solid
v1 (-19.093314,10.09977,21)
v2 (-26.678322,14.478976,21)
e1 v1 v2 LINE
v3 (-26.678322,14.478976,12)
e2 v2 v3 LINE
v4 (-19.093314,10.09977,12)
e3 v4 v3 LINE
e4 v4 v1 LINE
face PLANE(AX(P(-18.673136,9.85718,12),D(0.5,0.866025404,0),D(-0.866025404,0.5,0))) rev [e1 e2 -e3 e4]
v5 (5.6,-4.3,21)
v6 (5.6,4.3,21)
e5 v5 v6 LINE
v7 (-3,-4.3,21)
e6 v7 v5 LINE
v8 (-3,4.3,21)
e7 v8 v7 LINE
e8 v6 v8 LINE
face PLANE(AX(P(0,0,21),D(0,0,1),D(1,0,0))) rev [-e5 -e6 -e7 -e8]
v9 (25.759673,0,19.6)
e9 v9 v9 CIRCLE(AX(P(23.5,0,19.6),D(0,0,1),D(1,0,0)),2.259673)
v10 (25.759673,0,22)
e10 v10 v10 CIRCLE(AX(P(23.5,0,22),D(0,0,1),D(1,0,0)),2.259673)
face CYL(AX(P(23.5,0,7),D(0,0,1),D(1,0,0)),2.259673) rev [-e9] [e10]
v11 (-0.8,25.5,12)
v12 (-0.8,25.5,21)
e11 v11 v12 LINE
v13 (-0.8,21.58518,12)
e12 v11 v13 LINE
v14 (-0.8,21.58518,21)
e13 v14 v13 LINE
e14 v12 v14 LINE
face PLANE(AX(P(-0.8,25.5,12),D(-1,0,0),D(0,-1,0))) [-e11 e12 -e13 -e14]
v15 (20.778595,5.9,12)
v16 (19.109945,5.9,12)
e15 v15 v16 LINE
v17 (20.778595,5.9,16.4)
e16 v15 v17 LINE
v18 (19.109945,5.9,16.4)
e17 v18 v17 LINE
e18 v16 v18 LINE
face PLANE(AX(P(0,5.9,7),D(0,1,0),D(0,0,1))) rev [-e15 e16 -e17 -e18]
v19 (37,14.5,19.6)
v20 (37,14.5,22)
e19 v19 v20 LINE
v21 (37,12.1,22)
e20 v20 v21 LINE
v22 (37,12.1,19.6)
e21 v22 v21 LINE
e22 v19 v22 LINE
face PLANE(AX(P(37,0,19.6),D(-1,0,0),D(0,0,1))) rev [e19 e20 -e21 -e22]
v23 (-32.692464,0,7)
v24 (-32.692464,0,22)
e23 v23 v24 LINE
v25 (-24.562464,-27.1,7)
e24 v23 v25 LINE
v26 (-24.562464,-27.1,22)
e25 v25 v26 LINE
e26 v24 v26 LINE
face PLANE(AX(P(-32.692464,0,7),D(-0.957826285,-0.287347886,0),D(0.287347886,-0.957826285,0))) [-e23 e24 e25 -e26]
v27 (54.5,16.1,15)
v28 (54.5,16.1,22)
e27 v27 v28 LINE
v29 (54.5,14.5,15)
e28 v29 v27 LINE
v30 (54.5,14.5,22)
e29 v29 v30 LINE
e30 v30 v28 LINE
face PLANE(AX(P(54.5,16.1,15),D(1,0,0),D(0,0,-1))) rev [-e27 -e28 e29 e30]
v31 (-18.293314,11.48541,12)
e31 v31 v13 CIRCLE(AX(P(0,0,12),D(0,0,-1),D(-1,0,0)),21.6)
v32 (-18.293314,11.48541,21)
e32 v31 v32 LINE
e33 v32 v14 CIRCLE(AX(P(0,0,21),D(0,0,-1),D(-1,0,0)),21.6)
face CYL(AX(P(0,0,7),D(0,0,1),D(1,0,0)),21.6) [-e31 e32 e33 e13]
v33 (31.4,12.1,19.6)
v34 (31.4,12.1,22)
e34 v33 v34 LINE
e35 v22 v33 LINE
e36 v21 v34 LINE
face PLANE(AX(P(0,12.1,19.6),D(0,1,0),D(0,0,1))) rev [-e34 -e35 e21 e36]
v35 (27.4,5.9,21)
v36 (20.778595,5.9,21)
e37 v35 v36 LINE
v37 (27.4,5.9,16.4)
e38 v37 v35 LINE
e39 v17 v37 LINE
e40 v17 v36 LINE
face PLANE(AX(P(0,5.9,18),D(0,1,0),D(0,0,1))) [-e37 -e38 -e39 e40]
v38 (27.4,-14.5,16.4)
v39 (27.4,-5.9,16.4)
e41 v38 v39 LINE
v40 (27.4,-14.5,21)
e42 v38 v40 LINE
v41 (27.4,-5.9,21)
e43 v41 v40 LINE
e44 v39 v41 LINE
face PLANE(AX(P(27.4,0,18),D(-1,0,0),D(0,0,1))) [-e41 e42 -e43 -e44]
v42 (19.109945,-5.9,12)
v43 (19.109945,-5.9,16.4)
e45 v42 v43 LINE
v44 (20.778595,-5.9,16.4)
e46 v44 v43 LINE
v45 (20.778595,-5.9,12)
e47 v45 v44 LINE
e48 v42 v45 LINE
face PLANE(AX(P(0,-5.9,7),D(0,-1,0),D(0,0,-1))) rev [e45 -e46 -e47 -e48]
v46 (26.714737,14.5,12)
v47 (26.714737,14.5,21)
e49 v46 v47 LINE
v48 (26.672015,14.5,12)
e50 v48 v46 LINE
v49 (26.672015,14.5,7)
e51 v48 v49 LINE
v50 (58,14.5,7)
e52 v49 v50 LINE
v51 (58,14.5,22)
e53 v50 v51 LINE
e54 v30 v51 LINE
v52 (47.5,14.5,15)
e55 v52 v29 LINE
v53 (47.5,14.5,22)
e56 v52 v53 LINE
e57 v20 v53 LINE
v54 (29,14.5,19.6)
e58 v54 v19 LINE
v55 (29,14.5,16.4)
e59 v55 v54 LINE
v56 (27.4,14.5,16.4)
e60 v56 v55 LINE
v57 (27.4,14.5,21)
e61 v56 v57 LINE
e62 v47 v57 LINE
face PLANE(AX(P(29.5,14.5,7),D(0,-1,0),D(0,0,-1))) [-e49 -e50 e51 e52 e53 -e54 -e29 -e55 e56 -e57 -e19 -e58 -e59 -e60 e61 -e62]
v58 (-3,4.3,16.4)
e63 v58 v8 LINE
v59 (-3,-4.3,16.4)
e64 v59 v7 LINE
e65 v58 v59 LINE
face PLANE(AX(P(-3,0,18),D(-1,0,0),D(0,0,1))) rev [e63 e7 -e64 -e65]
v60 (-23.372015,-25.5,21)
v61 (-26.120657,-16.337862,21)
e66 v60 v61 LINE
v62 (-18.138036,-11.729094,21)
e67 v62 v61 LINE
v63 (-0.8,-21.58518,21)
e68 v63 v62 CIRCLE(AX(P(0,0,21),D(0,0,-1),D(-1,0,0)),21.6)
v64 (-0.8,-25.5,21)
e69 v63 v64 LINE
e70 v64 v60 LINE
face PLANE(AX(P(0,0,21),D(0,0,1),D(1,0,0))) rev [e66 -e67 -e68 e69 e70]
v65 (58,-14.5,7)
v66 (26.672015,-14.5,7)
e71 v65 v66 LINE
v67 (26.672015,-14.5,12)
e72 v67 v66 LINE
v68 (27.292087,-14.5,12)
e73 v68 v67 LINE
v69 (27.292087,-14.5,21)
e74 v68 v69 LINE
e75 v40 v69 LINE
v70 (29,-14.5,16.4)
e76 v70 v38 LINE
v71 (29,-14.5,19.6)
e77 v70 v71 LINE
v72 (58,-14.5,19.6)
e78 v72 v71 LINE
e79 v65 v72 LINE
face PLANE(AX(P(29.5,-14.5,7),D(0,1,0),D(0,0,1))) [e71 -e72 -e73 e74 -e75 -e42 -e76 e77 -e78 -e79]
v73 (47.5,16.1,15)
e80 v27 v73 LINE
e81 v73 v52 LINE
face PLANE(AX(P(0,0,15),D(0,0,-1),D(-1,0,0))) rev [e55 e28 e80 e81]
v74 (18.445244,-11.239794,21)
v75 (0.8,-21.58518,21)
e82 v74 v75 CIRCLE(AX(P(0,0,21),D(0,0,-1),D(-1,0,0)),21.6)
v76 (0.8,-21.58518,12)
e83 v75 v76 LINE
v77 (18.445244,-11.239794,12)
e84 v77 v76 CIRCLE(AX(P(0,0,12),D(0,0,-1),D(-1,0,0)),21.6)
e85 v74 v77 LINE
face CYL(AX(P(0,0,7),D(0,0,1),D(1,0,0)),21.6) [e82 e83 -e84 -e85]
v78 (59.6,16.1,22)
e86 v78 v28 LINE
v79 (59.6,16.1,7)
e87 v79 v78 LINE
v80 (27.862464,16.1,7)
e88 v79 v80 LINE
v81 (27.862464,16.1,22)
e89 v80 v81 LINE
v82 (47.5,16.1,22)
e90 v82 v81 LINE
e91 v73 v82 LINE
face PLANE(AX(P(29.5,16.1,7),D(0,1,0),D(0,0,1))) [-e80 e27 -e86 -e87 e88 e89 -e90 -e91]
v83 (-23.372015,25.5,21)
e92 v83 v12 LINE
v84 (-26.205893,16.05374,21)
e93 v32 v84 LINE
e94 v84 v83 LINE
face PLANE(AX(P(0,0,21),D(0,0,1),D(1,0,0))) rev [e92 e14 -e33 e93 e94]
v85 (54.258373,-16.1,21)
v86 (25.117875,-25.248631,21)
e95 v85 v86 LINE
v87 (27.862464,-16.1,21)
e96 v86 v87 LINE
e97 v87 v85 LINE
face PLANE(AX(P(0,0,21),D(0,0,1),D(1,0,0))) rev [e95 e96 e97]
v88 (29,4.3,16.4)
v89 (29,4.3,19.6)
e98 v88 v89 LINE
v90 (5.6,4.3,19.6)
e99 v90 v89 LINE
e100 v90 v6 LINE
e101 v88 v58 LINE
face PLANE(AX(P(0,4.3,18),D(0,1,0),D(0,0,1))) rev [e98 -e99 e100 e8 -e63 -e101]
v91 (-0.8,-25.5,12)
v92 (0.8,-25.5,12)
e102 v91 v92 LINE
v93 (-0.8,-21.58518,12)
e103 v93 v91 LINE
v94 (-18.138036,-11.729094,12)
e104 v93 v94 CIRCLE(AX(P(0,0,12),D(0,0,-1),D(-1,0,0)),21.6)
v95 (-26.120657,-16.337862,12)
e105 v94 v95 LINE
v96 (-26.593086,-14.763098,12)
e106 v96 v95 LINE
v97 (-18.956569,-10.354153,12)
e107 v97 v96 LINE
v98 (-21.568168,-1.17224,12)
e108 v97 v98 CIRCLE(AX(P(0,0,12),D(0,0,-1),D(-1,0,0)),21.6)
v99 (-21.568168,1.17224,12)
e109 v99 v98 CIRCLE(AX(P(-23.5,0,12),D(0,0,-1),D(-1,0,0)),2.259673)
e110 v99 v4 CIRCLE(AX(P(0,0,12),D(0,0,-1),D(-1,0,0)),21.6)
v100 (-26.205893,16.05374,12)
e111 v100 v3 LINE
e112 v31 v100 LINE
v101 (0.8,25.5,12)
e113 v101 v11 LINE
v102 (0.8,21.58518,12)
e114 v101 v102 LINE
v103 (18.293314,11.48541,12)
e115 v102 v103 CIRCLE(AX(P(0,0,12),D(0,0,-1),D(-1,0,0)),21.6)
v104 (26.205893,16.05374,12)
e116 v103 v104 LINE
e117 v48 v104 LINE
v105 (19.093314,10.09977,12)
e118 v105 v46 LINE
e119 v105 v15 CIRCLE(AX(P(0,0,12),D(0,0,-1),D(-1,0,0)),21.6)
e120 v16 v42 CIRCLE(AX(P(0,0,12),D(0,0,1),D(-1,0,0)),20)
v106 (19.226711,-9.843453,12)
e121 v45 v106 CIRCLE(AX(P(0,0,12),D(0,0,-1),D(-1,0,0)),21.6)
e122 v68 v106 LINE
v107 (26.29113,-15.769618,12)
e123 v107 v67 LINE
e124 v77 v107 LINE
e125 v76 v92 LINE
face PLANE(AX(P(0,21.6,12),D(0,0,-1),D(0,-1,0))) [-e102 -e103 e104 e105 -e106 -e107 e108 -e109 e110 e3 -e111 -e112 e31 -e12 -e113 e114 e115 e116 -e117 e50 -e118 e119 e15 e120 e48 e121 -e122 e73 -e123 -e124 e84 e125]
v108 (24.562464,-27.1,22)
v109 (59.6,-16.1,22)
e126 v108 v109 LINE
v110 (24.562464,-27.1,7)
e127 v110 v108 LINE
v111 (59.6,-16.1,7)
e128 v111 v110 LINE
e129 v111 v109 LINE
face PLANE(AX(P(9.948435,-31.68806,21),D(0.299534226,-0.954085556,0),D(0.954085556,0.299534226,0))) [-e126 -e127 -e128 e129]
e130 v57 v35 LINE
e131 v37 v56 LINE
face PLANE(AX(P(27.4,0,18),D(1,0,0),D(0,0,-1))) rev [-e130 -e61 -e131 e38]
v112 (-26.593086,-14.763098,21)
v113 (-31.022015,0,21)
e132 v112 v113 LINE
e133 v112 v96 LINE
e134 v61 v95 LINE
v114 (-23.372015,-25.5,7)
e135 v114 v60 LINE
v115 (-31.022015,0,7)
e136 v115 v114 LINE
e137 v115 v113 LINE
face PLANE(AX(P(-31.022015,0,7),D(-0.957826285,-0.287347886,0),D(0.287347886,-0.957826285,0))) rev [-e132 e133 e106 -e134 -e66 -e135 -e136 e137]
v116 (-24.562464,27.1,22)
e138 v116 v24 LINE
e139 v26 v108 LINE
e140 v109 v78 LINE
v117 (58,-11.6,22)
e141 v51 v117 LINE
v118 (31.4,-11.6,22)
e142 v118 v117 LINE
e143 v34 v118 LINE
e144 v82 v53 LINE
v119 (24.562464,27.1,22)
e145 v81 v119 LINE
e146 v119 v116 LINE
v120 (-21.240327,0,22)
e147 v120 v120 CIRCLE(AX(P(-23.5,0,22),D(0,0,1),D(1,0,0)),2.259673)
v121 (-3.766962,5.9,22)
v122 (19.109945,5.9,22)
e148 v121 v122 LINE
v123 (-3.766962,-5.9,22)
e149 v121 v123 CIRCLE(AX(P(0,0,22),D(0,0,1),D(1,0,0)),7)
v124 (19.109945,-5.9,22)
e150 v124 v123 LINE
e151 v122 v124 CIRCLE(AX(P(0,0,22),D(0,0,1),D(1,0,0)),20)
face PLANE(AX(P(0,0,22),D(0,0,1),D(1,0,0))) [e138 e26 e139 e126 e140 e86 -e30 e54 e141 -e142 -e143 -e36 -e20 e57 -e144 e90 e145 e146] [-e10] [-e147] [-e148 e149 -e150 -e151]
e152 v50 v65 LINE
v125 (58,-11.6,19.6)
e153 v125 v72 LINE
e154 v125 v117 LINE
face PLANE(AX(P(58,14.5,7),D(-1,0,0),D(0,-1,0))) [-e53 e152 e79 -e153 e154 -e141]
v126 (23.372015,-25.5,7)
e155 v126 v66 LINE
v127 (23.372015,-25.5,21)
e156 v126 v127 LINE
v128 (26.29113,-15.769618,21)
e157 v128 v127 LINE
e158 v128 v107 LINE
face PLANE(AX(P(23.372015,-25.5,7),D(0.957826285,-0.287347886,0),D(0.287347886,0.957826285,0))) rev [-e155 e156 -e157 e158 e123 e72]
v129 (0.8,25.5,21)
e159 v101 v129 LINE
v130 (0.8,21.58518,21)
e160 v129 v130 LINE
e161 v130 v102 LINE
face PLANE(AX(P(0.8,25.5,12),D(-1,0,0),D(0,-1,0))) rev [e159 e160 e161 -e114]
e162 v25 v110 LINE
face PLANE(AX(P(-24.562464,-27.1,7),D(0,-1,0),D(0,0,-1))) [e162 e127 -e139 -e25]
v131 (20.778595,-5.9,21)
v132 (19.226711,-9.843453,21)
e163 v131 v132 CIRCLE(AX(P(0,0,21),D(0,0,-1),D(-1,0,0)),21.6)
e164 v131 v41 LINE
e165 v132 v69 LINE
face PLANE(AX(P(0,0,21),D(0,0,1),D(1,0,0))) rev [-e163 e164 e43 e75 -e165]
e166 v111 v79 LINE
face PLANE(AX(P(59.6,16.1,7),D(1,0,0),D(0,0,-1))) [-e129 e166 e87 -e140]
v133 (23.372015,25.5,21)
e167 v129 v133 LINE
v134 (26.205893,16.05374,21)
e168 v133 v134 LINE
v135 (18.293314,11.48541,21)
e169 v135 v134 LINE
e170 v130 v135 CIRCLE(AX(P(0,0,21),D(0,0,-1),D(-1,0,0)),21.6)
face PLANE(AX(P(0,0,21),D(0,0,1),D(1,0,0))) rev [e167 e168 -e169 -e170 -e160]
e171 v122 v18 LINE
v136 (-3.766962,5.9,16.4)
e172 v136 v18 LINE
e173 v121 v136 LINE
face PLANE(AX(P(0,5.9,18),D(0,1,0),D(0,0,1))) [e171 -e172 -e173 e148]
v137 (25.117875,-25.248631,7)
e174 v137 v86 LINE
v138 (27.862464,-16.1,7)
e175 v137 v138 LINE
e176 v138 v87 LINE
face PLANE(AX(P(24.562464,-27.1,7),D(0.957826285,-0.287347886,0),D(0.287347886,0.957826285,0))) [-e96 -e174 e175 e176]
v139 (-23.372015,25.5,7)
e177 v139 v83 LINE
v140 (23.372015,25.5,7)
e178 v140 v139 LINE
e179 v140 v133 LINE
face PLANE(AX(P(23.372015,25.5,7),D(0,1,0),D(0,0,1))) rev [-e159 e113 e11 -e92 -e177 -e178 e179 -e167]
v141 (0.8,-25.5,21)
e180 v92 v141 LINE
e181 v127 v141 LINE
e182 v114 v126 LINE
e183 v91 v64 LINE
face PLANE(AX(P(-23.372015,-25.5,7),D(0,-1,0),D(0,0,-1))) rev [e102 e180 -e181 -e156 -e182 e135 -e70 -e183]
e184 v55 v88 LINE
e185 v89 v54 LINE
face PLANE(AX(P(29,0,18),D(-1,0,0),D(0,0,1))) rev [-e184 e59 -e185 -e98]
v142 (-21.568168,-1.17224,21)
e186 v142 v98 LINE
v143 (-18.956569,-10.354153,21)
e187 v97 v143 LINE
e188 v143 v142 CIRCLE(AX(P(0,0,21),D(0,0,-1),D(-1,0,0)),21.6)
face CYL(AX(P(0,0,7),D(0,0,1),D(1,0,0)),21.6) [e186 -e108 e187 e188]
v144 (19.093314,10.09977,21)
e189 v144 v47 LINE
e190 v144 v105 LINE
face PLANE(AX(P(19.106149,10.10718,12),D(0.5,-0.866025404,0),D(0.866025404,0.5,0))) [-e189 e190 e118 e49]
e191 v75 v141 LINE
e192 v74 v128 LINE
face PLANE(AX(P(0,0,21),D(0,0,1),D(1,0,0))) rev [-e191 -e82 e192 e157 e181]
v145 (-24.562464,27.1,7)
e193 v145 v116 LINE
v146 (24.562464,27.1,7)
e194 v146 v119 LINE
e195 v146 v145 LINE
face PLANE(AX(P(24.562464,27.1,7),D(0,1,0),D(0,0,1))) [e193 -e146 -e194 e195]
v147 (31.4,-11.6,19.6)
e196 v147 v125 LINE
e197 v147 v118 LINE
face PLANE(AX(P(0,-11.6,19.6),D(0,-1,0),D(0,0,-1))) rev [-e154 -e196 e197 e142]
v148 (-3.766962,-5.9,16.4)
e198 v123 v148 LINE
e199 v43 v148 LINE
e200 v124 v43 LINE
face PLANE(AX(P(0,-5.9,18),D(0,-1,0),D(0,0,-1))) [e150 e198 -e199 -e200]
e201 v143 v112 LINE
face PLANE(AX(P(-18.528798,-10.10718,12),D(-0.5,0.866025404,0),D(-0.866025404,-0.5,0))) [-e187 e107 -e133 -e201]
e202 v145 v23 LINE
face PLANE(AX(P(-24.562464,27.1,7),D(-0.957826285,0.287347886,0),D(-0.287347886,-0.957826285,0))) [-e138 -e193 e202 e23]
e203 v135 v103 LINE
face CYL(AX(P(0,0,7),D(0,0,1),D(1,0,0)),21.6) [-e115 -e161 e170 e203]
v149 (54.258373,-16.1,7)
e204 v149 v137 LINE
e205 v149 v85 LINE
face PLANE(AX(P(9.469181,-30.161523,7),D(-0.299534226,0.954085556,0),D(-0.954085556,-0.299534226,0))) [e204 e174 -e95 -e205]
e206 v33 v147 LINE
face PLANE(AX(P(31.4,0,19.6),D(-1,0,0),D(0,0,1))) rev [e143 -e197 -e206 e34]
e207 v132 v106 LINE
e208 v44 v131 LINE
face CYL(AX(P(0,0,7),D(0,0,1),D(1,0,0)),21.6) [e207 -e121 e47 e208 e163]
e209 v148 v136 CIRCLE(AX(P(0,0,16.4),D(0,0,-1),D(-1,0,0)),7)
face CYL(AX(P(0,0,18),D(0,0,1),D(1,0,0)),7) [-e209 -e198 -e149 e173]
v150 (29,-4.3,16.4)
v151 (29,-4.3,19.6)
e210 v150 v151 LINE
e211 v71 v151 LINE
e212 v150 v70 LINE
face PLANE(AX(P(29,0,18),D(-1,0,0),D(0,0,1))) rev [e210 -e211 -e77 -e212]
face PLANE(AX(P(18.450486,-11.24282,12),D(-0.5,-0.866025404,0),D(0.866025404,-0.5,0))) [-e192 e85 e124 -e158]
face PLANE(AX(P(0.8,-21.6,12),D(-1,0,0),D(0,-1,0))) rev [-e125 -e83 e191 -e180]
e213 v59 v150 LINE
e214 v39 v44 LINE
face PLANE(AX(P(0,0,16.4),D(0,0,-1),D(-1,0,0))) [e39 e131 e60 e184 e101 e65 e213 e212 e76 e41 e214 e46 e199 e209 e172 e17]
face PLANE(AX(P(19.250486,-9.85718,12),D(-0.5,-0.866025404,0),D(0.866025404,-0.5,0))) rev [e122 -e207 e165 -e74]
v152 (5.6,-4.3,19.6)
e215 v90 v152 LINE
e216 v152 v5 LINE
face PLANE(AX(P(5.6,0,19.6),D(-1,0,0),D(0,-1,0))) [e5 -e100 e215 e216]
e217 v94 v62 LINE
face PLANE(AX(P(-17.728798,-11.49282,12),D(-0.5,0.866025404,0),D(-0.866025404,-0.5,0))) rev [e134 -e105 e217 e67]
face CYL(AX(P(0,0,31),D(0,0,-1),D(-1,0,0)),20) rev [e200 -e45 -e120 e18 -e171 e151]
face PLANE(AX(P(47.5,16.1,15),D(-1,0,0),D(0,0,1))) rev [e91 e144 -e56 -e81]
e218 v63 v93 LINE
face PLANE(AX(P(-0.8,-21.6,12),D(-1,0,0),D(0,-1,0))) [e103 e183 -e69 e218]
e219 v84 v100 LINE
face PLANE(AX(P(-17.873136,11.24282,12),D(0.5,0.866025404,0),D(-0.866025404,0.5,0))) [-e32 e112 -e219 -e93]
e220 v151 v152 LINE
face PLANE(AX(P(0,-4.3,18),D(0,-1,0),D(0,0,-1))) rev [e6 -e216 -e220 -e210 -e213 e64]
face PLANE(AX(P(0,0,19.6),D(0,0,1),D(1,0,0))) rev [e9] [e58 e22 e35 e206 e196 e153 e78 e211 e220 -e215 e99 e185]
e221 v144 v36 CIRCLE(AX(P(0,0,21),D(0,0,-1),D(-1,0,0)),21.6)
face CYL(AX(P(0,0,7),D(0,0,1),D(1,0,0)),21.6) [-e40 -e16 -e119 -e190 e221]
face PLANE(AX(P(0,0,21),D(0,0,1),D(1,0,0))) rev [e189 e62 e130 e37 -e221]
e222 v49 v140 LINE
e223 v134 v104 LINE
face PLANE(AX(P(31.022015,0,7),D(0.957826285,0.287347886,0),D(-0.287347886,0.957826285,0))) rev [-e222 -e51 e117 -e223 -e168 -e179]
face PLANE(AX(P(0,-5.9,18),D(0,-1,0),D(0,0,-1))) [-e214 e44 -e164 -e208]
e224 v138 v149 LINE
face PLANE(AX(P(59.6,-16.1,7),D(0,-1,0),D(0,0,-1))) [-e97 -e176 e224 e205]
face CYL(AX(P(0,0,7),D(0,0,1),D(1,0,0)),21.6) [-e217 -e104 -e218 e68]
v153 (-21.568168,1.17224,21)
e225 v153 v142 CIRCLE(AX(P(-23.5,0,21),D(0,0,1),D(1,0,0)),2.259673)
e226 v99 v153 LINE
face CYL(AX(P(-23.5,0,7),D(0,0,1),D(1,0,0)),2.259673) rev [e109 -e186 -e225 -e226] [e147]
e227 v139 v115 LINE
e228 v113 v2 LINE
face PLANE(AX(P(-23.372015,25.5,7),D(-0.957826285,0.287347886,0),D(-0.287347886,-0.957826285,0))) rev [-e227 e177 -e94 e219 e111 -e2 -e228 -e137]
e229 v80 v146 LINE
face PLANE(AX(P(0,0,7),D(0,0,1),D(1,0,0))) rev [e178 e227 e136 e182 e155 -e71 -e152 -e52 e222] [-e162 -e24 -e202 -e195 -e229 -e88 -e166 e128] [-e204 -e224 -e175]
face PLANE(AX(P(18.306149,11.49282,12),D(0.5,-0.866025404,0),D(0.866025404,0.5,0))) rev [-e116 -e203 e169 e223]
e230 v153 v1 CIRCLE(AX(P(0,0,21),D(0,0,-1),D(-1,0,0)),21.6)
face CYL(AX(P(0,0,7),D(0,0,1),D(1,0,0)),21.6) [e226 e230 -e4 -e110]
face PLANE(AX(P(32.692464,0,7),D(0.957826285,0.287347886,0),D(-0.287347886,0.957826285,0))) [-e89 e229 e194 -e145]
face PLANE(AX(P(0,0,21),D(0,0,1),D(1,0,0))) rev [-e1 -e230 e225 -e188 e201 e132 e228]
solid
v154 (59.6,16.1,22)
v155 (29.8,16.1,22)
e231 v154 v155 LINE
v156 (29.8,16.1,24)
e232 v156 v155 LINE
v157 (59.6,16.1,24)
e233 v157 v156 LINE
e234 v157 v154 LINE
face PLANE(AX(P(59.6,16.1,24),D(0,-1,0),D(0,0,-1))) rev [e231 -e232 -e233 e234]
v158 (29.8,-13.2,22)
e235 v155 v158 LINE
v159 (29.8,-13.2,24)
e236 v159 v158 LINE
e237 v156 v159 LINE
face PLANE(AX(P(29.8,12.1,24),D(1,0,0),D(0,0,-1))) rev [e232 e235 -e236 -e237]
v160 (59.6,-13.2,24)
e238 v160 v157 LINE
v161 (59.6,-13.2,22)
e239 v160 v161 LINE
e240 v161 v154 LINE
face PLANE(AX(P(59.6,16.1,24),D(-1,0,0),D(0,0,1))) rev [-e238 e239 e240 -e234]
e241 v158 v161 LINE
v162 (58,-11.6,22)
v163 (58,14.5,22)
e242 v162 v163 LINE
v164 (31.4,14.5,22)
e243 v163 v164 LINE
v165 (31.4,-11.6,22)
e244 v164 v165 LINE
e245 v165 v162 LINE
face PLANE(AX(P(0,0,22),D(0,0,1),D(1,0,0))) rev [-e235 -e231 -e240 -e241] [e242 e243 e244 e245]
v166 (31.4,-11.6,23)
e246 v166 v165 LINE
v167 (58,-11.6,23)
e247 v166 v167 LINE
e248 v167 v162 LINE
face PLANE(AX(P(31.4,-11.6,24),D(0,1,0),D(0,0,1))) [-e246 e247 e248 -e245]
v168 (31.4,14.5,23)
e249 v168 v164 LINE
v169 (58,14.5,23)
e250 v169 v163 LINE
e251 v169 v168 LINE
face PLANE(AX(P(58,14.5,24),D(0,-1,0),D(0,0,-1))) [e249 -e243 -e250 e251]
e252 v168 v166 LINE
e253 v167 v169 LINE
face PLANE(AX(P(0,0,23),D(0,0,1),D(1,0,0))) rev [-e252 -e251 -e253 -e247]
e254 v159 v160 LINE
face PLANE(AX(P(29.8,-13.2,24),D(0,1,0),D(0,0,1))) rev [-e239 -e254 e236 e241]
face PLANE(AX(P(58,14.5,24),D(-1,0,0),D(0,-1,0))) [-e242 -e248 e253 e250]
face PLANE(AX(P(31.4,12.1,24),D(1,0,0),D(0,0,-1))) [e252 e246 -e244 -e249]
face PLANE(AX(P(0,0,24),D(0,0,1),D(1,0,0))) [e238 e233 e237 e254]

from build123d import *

# Parameters (mm, degrees)
BOSS_EXTRUDE1_DEPTH      = 10
BOSS_EXTRUDE1_DEPTH_BACK = 5
BOSS_EXTRUDE2_DEPTH      = 15
CUT_EXTRUDE1_DEPTH       = 68.168221653
BOSS_EXTRUDE3_DEPTH      = 4
SKETCH7_R                = 1.75
BOSS_EXTRUDE4_DEPTH      = 2.4
SKETCH8_R                = 3.5
BOSS_EXTRUDE5_DEPTH      = 1
CUT_EXTRUDE2_DEPTH       = 10
BOSS_EXTRUDE7_START      = 14
BOSS_EXTRUDE7_DEPTH      = 14
RIB9_START               = -9
RIB9_DEPTH               = 9
CUT_EXTRUDE3_DEPTH       = 5
SKETCH18_R               = 2.259673145
CUT_EXTRUDE4_DEPTH       = 68.168221653
SKETCH20_R               = 3.5
SKETCH20_W               = 8.6
SKETCH20_H               = 8.6
BOSS_EXTRUDE8_DEPTH      = 1
SKETCH21_W               = 7
SKETCH21_H               = 1.6
CUT_EXTRUDE5_DEPTH       = 7
BOSS_EXTRUDE9_DEPTH      = 1
BOSS_EXTRUDE10_DEPTH     = 14
BOSS_EXTRUDE11_DEPTH     = 2
SKETCH25_W               = 26.6
SKETCH25_H               = 26.1
BOSS_EXTRUDE12_DEPTH     = 1
BOSS_EXTRUDE13_DEPTH     = 4
CUT_EXTRUDE6_START       = -4
CUT_EXTRUDE6_DEPTH       = 4
BOSS_EXTRUDE14_DEPTH     = 1.6


# Read off the part's stored shape, not the designer's step: Rib9
with BuildPart() as part:
    # Sketch2 → Boss-Extrude1 (new, two sides: drawn at the far end of the back side and taken through both)
    with BuildSketch(Plane.XY.offset(12).offset(-BOSS_EXTRUDE1_DEPTH_BACK)):
        Polygon((-24.562464367, 27.1), (-32.692464367, 0), (-24.562464367, -27.1), (24.562464367, -27.1), (32.692464367, 0), (24.562464367, 27.1), align=None)
        Polygon((-23.372015325, 25.5), (-31.022015325, 0), (-23.372015325, -25.5), (23.372015325, -25.5), (31.022015325, 0), (23.372015325, 25.5), align=None, mode=Mode.SUBTRACT)
    extrude(amount=BOSS_EXTRUDE1_DEPTH + BOSS_EXTRUDE1_DEPTH_BACK)

    # Sketch3 → Boss-Extrude2 (add)
    with BuildSketch(Plane.XY.offset(22)):
        Polygon((29.5, 16.1), (59.6, 16.1), (59.6, -16.1), (29.5, -16.1), (27.862464367, -16.1), (28.342464367, -14.5), (29.5, -14.5), (58, -14.5), (58, 14.5), (29.5, 14.5), (28.342464367, 14.5), (27.862464367, 16.1), align=None)
    extrude(amount=-BOSS_EXTRUDE2_DEPTH)

    # Sketch4 → Cut-Extrude1 (cut, through all)
    with BuildSketch(Plane(origin=(0, 0, 7), x_dir=(-1, 0, 0), z_dir=(0, 0, -1))):
        Polygon((-26.672015325, 14.5), (-28.342464367, 14.5), (-32.692464367, 0), (-28.342464367, -14.5), (-26.672015325, -14.5), (-31.022015325, 0), align=None)
    extrude(amount=-CUT_EXTRUDE1_DEPTH, mode=Mode.SUBTRACT)

    # Sketch5 → Boss-Extrude3 (add)
    with BuildSketch(Plane.XY.offset(22)):
        Polygon((29, 4.3), (29, 14), (29, 14.5), (27.4, 14.5), (27.4, 14), (27.4, 5.9), (-4.6, 5.9), (-4.6, -5.9), (27.4, -5.9), (27.4, -14), (27.4, -14.5), (29, -14.5), (29, -14), (29, -4.3), (-3, -4.3), (-3, 4.3), align=None)
    extrude(amount=-BOSS_EXTRUDE3_DEPTH)

    # Sketch7 → Boss-Extrude4 (add)
    with BuildSketch(Plane.XY.offset(22)):
        Polygon((37, 12.1), (37, 14.5), (29, 14.5), (29, 4.3), (5.6, 4.3), (5.6, -4.3), (29, -4.3), (29, -14.5), (58, -14.5), (58, -11.6), (31.4, -11.6), (31.4, 12.1), align=None)
        with Locations((23.5, 0)):
            Circle(SKETCH7_R, mode=Mode.SUBTRACT)
    extrude(amount=-BOSS_EXTRUDE4_DEPTH)

    # Sketch8 → Boss-Extrude5 (add)
    with BuildSketch(Plane.XY.offset(22)):
        Polygon((27.4, -5.9), (27.4, -14.5), (26.672015325, -14.5), (23.372015325, -25.5), (-23.372015325, -25.5), (-31.022015325, 0), (-23.372015325, 25.5), (23.372015325, 25.5), (26.672015325, 14.5), (27.4, 14.5), (27.4, 5.9), (-4.6, 5.9), (-4.6, -5.9), align=None)
        with Locations((-18.25, 18.25)):
            Circle(SKETCH8_R, mode=Mode.SUBTRACT)
        with Locations((18.25, 18.25)):
            Circle(SKETCH8_R, mode=Mode.SUBTRACT)
        with Locations((18.25, -18.25)):
            Circle(SKETCH8_R, mode=Mode.SUBTRACT)
        with Locations((-18.25, -18.25)):
            Circle(SKETCH8_R, mode=Mode.SUBTRACT)
    extrude(amount=-BOSS_EXTRUDE5_DEPTH)

    # Sketch11 → Cut-Extrude2 (cut)
    with BuildSketch(Plane(origin=(0, 0, 21), x_dir=(-1, 0, 0), z_dir=(0, 0, -1))):
        with BuildLine():
            Line((4.6, -5.9), (-19.109945055, -5.9))
            ThreePointArc((-19.109945055, -5.9), (2.983378865, -19.776234489), (20, 0))
            ThreePointArc((20, 0), (2.983378865, 19.776234489), (-19.109945055, 5.9))
            Line((-19.109945055, 5.9), (4.6, 5.9))
            Line((4.6, 5.9), (4.6, -5.9))
        make_face()
    extrude(amount=-CUT_EXTRUDE2_DEPTH, mode=Mode.SUBTRACT)

    # Sketch12 → Boss-Extrude7 (add)
    with BuildSketch(Plane(origin=(0, 0, 21), x_dir=(-1, 0, 0), z_dir=(0, 0, -1)).offset(BOSS_EXTRUDE7_START)):
        with BuildLine():
            ThreePointArc((21.6, 0), (2.978452055, 21.393663159), (-20.778594755, 5.9))
            Line((-20.778594755, 5.9), (-19.109945055, 5.9))
            ThreePointArc((-19.109945055, 5.9), (20, 0), (-19.109945055, -5.9))
            Line((-19.109945055, -5.9), (-20.778594755, -5.9))
            ThreePointArc((-20.778594755, -5.9), (2.978452055, -21.393663159), (21.6, 0))
        make_face()
    extrude(amount=-BOSS_EXTRUDE7_DEPTH)

    # Rib9 outline → Rib9 (add)
    with BuildSketch(Plane(origin=(0, 0, 12), x_dir=(-1, 0, 0), z_dir=(0, 0, -1)).offset(RIB9_START)):
        with BuildLine():
            ThreePointArc((-0.8, 21.585180101), (0, 21.6), (0.8, 21.585180101))
            Line((0.8, 21.585180101), (0.8, 25.5))
            Line((0.8, 25.5), (-0.8, 25.5))
            Line((-0.8, 25.5), (-0.8, 21.585180101))
        make_face()
        with BuildLine():
            Line((26.205893326, 16.053739997), (18.293314313, 11.485410374))
            ThreePointArc((18.293314313, 11.485410374), (18.706148722, 10.8), (19.093314313, 10.099769728))
            Line((19.093314313, 10.099769728), (26.678322459, 14.478976222))
            Line((26.678322459, 14.478976222), (26.205893326, 16.053739997))
        make_face()
        with BuildLine():
            ThreePointArc((-19.093314313, 10.099769728), (-18.706148721, 10.8), (-18.293314313, 11.485410374))
            Line((-18.293314313, 11.485410374), (-26.205893326, 16.053739997))
            Line((-26.205893326, 16.053739997), (-26.672015325, 14.5))
            Line((-26.672015325, 14.5), (-26.71473671, 14.5))
            Line((-26.71473671, 14.5), (-19.093314313, 10.099769728))
        make_face()
        with BuildLine():
            Line((26.593085869, -14.763098188), (18.9565691, -10.354153175))
            ThreePointArc((18.9565691, -10.354153175), (18.560039094, -11.049205801), (18.138036207, -11.729093851))
            Line((18.138036207, -11.729093851), (26.120656737, -16.337861962))
            Line((26.120656737, -16.337861962), (26.593085869, -14.763098188))
        make_face()
        with BuildLine():
            Line((0.8, -25.5), (0.8, -21.585180101))
            ThreePointArc((0.8, -21.585180101), (0, -21.6), (-0.8, -21.585180101))
            Line((-0.8, -21.585180101), (-0.8, -25.5))
            Line((-0.8, -25.5), (0.8, -25.5))
        make_face()
        with BuildLine():
            Line((-26.291129916, -15.769618032), (-18.445244234, -11.239793821))
            ThreePointArc((-18.445244234, -11.239793821), (-18.848912462, -10.548862451), (-19.226711341, -9.843453205))
            Line((-19.226711341, -9.843453205), (-27.292086979, -14.5))
            Line((-27.292086979, -14.5), (-26.672015325, -14.5))
            Line((-26.672015325, -14.5), (-26.291129916, -15.769618032))
        make_face()
    extrude(amount=RIB9_DEPTH)

    # Sketch17 → Cut-Extrude3 (cut)
    with BuildSketch(Plane(origin=(0, 0, 7), x_dir=(-1, 0, 0), z_dir=(0, 0, -1))):
        with BuildLine():
            Line((-19.109945055, -5.9), (-20.778594755, -5.9))
            ThreePointArc((-20.778594755, -5.9), (21.6, 0), (-20.778594755, 5.9))
            Line((-20.778594755, 5.9), (-19.109945055, 5.9))
            ThreePointArc((-19.109945055, 5.9), (20, 0), (-19.109945055, -5.9))
        make_face()
    extrude(amount=-CUT_EXTRUDE3_DEPTH, mode=Mode.SUBTRACT)

    # Sketch18 → Cut-Extrude4 (cut, through all)
    with BuildSketch(Plane.XY.offset(22)):
        with Locations((-23.5, 0)):
            Circle(SKETCH18_R)
        with Locations((23.5, 0)):
            Circle(SKETCH18_R)
    extrude(amount=-CUT_EXTRUDE4_DEPTH, mode=Mode.SUBTRACT)

    # Sketch20 → Boss-Extrude8 (add)
    with BuildSketch(Plane.XY.offset(22)):
        with Locations((18.25, 18.25)):
            Circle(SKETCH20_R)
        with Locations((18.25, -18.25)):
            Circle(SKETCH20_R)
        with Locations((-18.25, -18.25)):
            Circle(SKETCH20_R)
        with Locations((-18.25, 18.25)):
            Circle(SKETCH20_R)
        with Locations((1.3, 0)):
            Rectangle(SKETCH20_W, SKETCH20_H)
    extrude(amount=-BOSS_EXTRUDE8_DEPTH)

    # Sketch21 → Cut-Extrude5 (cut)
    with BuildSketch(Plane.XY.offset(22)):
        with Locations((51, 15.3)):
            Rectangle(SKETCH21_W, SKETCH21_H)
    extrude(amount=-CUT_EXTRUDE5_DEPTH, mode=Mode.SUBTRACT)

    # Sketch22 → Boss-Extrude9 (add)
    with BuildSketch(Plane.XY.offset(22)):
        Polygon((24.562464367, -27.1), (59.6, -16.1), (27.862464367, -16.1), align=None)
    extrude(amount=-BOSS_EXTRUDE9_DEPTH)

    # Sketch23 → Boss-Extrude10 (add)
    with BuildSketch(Plane(origin=(0, 0, 21), x_dir=(-1, 0, 0), z_dir=(0, 0, -1))):
        Polygon((-25.117875099, -25.248630892), (-54.258373362, -16.1), (-59.6, -16.1), (-24.562464367, -27.1), align=None)
    extrude(amount=BOSS_EXTRUDE10_DEPTH)

    # Sketch26 → Boss-Extrude13 (add)
    with BuildSketch(Plane.XY.offset(22)):
        with BuildLine():
            ThreePointArc((-7, 0), (-6.371812929, -2.898275349), (-4.6, -5.276362383))
            Line((-4.6, -5.276362383), (-4.6, 0))
            Line((-4.6, 0), (-7, 0))
        make_face()
        with BuildLine():
            Line((-7, 0), (-4.6, 0))
            Line((-4.6, 0), (-4.6, 5.276362383))
            ThreePointArc((-4.6, 5.276362383), (-6.371812929, 2.898275349), (-7, 0))
        make_face()
    extrude(amount=-BOSS_EXTRUDE13_DEPTH)

    # Sketch28 → Cut-Extrude6 (cut)
    with BuildSketch(Plane(origin=(0, 0, 18), x_dir=(-1, 0, 0), z_dir=(0, 0, -1)).offset(CUT_EXTRUDE6_START)):
        with BuildLine():
            ThreePointArc((3.76696164, 5.9), (4.195085546, 5.603682473), (4.6, 5.276362383))
            Line((4.6, 5.276362383), (4.6, 5.9))
            Line((4.6, 5.9), (3.76696164, 5.9))
        make_face()
        with BuildLine():
            Line((3.76696164, -5.9), (4.6, -5.9))
            Line((4.6, -5.9), (4.6, -5.276362383))
            ThreePointArc((4.6, -5.276362383), (4.195085546, -5.603682473), (3.76696164, -5.9))
        make_face()
    extrude(amount=CUT_EXTRUDE6_DEPTH, mode=Mode.SUBTRACT)

    # Sketch29 → Boss-Extrude14 (add)
    with BuildSketch(Plane(origin=(0, 0, 18), x_dir=(-1, 0, 0), z_dir=(0, 0, -1))):
        with BuildLine():
            Line((3.76696164, 5.9), (-19.109945055, 5.9))
            Line((-19.109945055, 5.9), (-20.778594755, 5.9))
            Line((-20.778594755, 5.9), (-27.4, 5.9))
            Line((-27.4, 5.9), (-27.4, 14.5))
            Line((-27.4, 14.5), (-29, 14.5))
            Line((-29, 14.5), (-29, 4.3))
            Line((-29, 4.3), (3, 4.3))
            Line((3, 4.3), (3, -4.3))
            Line((3, -4.3), (-29, -4.3))
            Line((-29, -4.3), (-29, -14.5))
            Line((-29, -14.5), (-27.4, -14.5))
            Line((-27.4, -14.5), (-27.4, -5.9))
            Line((-27.4, -5.9), (-20.778594755, -5.9))
            Line((-20.778594755, -5.9), (-19.109945055, -5.9))
            Line((-19.109945055, -5.9), (3.76696164, -5.9))
            ThreePointArc((3.76696164, -5.9), (7, 0), (3.76696164, 5.9))
        make_face()
    extrude(amount=BOSS_EXTRUDE14_DEPTH)


with BuildPart() as body_2:
    # Sketch24 → Boss-Extrude11 (new body)
    with BuildSketch(Plane.XY.offset(22)):
        Polygon((59.6, 16.1), (29.8, 16.1), (29.8, 12.1), (29.8, -13.2), (59.6, -13.2), align=None)
        Polygon((58, 14.5), (58, -11.6), (31.4, -11.6), (31.4, 12.1), (31.4, 14.5), align=None, mode=Mode.SUBTRACT)
    extrude(amount=BOSS_EXTRUDE11_DEPTH)

    # Sketch25 → Boss-Extrude12 (add)
    with BuildSketch(Plane.XY.offset(24)):
        with Locations((44.7, 1.45)):
            Rectangle(SKETCH25_W, SKETCH25_H)
    extrude(amount=-BOSS_EXTRUDE12_DEPTH)


solid = Compound([part.part, body_2.part])
